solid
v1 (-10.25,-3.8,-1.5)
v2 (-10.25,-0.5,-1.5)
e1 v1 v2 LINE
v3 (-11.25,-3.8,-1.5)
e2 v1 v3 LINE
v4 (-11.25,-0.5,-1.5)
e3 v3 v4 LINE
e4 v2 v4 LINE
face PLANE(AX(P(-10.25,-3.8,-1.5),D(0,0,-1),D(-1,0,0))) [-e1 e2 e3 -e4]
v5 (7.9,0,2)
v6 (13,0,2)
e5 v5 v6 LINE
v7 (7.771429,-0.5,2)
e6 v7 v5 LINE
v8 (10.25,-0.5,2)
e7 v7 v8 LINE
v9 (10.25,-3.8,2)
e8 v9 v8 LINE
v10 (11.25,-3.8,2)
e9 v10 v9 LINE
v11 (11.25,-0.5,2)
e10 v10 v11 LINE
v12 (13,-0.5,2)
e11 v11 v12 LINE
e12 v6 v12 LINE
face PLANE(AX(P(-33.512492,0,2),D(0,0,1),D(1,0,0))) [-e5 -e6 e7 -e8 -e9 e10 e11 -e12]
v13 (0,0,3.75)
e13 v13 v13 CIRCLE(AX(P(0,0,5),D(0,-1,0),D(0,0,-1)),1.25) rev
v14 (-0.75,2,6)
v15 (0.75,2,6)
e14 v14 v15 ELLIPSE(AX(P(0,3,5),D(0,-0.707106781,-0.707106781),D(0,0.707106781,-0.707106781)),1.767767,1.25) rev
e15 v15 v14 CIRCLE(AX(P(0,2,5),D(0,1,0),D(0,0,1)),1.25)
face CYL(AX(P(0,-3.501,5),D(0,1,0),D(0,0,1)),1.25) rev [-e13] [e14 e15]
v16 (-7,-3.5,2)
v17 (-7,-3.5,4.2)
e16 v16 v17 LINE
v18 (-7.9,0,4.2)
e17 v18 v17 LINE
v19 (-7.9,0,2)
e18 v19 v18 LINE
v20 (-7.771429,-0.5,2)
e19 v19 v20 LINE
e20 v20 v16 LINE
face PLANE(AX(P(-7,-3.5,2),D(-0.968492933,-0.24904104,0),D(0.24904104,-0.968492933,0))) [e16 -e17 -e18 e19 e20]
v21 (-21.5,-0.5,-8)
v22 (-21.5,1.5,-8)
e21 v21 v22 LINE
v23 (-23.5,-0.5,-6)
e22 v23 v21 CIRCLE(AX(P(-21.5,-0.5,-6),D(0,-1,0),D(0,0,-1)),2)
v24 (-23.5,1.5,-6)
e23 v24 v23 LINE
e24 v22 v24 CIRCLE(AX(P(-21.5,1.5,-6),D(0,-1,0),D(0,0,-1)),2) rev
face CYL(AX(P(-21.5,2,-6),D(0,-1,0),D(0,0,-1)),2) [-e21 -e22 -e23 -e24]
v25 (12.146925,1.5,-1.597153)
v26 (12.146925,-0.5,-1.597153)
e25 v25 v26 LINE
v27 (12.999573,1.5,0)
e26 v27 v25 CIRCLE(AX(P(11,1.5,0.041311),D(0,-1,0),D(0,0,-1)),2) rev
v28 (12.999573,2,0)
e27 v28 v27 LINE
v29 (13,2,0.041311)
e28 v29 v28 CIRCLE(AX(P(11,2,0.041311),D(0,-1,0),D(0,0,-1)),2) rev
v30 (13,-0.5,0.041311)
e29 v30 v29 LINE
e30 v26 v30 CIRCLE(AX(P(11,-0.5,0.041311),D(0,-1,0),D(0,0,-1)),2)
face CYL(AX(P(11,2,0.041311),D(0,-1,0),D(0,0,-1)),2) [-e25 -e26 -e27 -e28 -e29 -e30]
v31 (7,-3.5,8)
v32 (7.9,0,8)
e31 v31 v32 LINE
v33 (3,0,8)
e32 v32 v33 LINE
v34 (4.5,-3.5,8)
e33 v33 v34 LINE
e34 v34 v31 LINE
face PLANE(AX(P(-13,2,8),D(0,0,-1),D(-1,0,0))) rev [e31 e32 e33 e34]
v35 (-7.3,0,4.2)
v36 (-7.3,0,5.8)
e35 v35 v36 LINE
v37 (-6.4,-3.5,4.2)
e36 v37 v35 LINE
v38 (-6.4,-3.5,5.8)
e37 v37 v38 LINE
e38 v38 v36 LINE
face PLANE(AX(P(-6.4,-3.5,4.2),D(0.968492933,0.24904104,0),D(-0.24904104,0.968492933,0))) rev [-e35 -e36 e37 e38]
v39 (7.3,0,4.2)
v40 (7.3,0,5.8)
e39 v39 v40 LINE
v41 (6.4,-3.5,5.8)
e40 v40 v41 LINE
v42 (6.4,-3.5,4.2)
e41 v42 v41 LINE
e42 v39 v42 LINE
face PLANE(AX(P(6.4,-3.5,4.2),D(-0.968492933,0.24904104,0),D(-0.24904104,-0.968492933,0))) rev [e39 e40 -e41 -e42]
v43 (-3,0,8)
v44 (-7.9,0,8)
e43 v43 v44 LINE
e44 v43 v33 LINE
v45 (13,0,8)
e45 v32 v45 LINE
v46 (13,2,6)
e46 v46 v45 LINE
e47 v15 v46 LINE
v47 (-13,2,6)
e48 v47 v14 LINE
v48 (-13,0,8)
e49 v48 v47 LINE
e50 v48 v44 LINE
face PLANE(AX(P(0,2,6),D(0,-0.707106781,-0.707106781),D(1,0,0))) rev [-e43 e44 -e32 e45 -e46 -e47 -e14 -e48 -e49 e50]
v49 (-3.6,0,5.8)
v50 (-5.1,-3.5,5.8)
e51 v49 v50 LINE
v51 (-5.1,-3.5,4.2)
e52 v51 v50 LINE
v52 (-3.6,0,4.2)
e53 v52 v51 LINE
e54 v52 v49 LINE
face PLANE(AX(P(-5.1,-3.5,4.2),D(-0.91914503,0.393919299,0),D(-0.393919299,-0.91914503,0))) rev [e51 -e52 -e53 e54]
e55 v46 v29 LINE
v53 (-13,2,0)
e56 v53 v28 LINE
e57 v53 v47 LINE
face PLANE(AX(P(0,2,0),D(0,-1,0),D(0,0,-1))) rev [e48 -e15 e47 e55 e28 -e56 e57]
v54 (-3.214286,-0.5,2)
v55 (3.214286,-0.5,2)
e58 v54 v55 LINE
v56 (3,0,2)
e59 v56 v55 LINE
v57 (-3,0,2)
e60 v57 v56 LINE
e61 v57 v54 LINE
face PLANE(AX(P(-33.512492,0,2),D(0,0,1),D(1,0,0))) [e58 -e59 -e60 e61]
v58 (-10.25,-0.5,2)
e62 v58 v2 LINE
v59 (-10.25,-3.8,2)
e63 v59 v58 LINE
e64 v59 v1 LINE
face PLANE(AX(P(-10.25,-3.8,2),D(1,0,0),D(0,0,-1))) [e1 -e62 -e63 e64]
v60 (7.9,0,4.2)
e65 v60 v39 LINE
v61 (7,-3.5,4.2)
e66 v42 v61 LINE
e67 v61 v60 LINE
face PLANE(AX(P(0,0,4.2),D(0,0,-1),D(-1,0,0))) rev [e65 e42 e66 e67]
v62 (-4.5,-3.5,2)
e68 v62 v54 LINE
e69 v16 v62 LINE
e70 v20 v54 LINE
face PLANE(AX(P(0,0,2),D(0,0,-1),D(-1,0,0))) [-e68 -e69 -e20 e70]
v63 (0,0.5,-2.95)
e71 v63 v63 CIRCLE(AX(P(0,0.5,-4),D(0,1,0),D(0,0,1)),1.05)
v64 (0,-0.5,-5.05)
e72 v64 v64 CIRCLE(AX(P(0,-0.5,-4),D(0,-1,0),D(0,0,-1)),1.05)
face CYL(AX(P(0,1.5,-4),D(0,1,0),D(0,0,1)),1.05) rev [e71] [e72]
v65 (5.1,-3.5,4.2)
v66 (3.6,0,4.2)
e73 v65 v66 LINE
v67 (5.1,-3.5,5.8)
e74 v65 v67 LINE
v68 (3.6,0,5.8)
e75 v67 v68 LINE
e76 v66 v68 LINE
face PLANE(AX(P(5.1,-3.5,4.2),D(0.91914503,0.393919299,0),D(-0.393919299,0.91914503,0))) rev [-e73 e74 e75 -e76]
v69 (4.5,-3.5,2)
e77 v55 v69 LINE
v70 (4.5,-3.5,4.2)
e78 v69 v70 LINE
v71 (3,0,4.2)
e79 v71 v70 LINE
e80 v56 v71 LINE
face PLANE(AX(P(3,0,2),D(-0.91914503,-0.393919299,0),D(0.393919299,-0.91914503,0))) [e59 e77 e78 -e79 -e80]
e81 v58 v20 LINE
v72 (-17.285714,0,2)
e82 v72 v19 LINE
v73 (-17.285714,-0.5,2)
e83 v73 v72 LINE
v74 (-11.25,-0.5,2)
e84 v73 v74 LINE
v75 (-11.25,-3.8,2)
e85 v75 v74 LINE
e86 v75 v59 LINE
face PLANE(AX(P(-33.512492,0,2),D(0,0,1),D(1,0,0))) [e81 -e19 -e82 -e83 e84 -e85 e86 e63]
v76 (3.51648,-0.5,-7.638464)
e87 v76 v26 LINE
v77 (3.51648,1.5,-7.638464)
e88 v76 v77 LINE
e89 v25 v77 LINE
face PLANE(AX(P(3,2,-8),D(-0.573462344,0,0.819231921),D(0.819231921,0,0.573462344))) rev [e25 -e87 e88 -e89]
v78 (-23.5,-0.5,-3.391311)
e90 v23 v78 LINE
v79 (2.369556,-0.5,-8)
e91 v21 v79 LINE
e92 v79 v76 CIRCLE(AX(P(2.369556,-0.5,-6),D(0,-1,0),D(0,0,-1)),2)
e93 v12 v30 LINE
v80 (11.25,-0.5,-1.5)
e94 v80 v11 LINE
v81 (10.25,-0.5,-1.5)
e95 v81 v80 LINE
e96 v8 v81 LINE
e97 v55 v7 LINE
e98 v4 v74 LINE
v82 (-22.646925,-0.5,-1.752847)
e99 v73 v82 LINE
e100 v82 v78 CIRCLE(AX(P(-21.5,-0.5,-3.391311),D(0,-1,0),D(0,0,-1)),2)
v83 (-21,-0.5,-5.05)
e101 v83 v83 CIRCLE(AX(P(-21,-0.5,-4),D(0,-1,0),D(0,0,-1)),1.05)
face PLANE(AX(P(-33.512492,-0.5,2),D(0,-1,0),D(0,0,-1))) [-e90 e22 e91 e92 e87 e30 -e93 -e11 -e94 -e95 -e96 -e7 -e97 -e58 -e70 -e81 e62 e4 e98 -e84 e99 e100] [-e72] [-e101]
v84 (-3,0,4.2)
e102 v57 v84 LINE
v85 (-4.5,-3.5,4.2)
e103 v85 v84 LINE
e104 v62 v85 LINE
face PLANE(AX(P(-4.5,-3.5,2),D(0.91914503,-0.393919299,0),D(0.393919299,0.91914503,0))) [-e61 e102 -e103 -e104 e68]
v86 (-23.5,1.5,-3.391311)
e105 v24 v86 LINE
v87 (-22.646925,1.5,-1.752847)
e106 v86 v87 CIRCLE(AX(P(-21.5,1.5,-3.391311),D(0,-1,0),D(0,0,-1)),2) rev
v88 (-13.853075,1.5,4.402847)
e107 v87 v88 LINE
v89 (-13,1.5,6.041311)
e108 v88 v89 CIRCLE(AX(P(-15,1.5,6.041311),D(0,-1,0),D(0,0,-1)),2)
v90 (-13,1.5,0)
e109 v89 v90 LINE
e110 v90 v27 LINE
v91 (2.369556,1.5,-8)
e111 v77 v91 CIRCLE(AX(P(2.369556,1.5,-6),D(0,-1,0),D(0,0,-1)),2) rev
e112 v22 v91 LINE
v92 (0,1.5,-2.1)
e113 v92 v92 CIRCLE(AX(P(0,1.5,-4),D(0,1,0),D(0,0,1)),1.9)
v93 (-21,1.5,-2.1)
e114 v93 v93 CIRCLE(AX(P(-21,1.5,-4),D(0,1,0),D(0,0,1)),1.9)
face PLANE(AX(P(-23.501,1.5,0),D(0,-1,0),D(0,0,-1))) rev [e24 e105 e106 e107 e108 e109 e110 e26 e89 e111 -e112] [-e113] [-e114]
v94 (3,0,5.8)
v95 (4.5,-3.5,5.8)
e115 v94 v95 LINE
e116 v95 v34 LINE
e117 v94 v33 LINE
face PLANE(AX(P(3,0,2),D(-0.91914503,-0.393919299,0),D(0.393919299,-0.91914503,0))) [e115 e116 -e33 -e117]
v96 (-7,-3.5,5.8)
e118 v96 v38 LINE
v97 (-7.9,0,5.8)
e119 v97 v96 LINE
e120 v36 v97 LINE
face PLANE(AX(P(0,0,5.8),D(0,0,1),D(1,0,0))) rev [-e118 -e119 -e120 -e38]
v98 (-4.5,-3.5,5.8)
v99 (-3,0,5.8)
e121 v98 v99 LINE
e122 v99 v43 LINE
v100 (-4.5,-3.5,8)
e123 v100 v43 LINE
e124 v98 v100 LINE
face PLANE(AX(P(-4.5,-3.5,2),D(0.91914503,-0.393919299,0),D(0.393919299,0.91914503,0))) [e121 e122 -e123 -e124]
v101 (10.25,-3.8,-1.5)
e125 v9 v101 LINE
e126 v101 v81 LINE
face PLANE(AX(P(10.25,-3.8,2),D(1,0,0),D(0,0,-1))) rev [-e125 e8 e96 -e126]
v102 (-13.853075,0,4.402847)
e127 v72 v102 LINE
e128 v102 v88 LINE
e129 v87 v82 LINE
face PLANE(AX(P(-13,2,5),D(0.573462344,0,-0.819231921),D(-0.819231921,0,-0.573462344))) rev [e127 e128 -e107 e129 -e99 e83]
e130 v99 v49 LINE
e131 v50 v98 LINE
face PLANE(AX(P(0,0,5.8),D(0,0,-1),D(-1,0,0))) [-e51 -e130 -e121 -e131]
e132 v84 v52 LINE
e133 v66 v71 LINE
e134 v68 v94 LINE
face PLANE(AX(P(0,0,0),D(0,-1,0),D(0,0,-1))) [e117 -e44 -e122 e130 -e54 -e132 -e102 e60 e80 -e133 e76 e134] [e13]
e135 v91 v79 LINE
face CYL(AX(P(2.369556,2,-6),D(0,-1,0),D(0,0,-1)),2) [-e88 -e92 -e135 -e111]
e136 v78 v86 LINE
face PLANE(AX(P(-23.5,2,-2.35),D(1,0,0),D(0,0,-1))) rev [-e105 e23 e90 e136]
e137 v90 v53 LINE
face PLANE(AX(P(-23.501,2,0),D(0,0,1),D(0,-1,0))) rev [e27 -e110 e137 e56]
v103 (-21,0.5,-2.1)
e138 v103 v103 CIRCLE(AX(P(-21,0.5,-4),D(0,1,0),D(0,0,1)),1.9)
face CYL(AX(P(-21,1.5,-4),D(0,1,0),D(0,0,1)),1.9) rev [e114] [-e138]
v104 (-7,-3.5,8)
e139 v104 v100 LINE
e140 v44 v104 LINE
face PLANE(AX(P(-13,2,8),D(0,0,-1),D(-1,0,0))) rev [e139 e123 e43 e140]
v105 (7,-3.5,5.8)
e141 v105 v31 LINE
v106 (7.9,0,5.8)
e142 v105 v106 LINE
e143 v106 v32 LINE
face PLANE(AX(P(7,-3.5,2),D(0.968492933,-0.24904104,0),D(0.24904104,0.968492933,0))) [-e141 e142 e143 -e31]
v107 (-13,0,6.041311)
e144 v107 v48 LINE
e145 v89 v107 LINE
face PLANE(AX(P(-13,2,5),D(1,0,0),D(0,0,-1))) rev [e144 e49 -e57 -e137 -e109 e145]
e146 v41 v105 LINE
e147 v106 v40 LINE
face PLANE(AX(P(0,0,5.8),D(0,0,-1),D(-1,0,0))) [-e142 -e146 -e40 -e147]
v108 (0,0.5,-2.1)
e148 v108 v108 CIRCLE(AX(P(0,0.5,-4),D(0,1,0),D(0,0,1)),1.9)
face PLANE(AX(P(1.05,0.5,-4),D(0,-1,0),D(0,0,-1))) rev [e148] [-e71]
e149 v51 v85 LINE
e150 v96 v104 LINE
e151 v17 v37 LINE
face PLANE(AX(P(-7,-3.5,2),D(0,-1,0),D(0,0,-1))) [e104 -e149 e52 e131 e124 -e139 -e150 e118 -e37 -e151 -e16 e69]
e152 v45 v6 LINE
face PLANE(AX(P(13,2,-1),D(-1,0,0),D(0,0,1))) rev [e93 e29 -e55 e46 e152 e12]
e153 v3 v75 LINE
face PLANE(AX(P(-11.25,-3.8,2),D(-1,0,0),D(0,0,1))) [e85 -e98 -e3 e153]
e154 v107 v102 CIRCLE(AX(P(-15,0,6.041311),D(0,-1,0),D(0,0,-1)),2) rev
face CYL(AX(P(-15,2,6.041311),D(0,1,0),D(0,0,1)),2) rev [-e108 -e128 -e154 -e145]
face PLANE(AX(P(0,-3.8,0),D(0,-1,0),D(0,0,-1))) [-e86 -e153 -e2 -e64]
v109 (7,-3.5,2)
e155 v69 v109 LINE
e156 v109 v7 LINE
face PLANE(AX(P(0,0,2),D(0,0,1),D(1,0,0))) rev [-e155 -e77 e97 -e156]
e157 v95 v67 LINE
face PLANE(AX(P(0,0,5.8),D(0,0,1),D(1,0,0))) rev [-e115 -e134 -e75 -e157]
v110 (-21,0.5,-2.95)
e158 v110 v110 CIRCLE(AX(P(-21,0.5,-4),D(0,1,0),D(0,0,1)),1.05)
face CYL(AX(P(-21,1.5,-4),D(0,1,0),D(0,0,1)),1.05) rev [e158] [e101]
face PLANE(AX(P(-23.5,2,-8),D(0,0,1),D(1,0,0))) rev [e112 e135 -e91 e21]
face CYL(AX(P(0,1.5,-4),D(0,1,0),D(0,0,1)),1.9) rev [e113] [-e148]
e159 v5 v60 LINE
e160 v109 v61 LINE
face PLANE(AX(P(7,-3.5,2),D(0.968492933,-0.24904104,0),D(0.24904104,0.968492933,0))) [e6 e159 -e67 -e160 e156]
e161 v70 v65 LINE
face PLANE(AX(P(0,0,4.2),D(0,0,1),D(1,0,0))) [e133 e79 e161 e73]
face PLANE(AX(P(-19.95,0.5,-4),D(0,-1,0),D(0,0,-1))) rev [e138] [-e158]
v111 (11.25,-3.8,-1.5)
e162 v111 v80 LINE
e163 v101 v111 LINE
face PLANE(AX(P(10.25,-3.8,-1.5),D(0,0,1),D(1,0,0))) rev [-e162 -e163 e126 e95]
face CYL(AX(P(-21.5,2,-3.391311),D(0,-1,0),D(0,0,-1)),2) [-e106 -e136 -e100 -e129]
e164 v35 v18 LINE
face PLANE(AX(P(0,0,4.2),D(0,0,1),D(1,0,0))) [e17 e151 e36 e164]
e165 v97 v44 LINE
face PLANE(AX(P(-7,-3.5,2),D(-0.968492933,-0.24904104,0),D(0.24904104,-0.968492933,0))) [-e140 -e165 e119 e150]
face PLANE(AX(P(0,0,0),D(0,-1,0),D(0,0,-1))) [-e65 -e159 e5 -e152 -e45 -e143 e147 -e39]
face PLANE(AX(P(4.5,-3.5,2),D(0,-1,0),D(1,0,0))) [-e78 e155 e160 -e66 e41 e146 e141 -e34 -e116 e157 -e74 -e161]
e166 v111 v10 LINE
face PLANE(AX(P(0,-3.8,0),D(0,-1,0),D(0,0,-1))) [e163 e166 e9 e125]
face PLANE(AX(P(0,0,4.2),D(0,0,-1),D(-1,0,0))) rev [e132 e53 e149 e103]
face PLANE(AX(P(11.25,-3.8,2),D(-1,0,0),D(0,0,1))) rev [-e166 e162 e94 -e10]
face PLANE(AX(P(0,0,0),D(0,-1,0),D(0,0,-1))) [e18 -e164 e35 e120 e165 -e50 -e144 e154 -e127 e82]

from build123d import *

# Parameters (mm, degrees)
EXTRUDE_1_DEPTH              = 2
EXTRUDE_3_DEPTH              = 6
CUT_EXTRUDE_1_REACH          = 27.426
SKETCH_5_R                   = 1.25
EXTRUDE_4_REACH              = 39.53
SKETCH_6_W                   = 10
SKETCH_6_H                   = 0.5
CUT_EXTRUDE_2_REACH          = 39.53
SKETCH_7_W                   = 8
SKETCH_7_H                   = 0.5
SKETCH_10_W                  = 1
SKETCH_10_H                  = 3.5
EXTRUDE_5_DEPTH              = 3.3
CHAMFER_1_SIZE               = 2
CUT_EXTRUDE_3_REACH          = 27.114
CUT_EXTRUDE_4_DEPTH          = 0.5
HOLE_WIZARD_M2_2_D           = 2.1
HOLE_WIZARD_M2_2_CBORE_D     = 3.8
HOLE_WIZARD_M2_2_CBORE_DEPTH = 1
FILLET_3_R                   = 2
CUT_EXTRUDE_5_DEPTH          = 0.8


with BuildPart() as part:
    # ｽｹｯﾁ1 → ﾎﾞｽ - 押し出し1 (new body)
    with BuildSketch(Plane(origin=(0, 0, 0), x_dir=(1, 0, 0), z_dir=(0, 1, 0))):
        Polygon((-13, 8), (3, 8), (13, 1), (13, -8), (-13, -8), (-13, -5), (-23.5, 2.35), (-23.5, 8), align=None)
    extrude(amount=EXTRUDE_1_DEPTH)

    # ｽｹｯﾁ4 → ﾎﾞｽ - 押し出し3 (add)
    with BuildSketch(Plane.XY.offset(8)):
        Polygon((-7, -3.5), (-4.5, -3.5), (-3, 0), (-7.9, 0), align=None)
        Polygon((3, 0), (4.5, -3.5), (7, -3.5), (7.9, 0), align=None)
    extrude(amount=-EXTRUDE_3_DEPTH)

    # ｽｹｯﾁ5 → ｶｯﾄ - 押し出し1 (cut, up to next)
    with BuildSketch(Plane(origin=(0, 2, 0), x_dir=(1, 0, 0), z_dir=(0, 1, 0)), mode=Mode.PRIVATE) as cut_extrude_1_sk1:
        with Locations(Location((0, -5, 0), (0, 0, 270))):
            Circle(SKETCH_5_R)
    cut_extrude_1_tool1 = extrude(cut_extrude_1_sk1.sketch, amount=-CUT_EXTRUDE_1_REACH, mode=Mode.PRIVATE) & part.part
    add(cut_extrude_1_tool1.solids().sort_by_distance((0, 2, 5))[0], mode=Mode.SUBTRACT)

    # ﾎﾞｽ - 押し出し4: up to this face of the body (flat: up to its plane)
    extrude_4_end = Plane(part.part.faces().sort_by_distance((-23.5, 1, -5.175))[0])
    # ｽｹｯﾁ6 → ﾎﾞｽ - 押し出し4 (add, up to the picked face)
    with BuildSketch(Plane(origin=(13, 0, 0), x_dir=(0, 0, -1), z_dir=(1, 0, 0)), mode=Mode.PRIVATE) as extrude_4_sk1:
        with Locations((3, -0.25)):
            Rectangle(SKETCH_6_W, SKETCH_6_H)
    extrude_4_tool1 = split(extrude(extrude_4_sk1.sketch, amount=-EXTRUDE_4_REACH, mode=Mode.PRIVATE), bisect_by=extrude_4_end, keep=Keep.BOTH, mode=Mode.PRIVATE)
    add(extrude_4_tool1.solids().sort_by(Axis((13, -0.25, -3), (-1, 0, 0)))[0])

    # ｽｹｯﾁ7 → ｶｯﾄ - 押し出し2 (cut, up to next)
    with BuildSketch(Plane(origin=(13, 0, 0), x_dir=(0, 0, -1), z_dir=(1, 0, 0)), mode=Mode.PRIVATE) as cut_extrude_2_sk1:
        with Locations((4, 1.75)):
            Rectangle(SKETCH_7_W, SKETCH_7_H)
    cut_extrude_2_tool1 = extrude(cut_extrude_2_sk1.sketch, amount=-CUT_EXTRUDE_2_REACH, mode=Mode.PRIVATE) & part.part
    add(cut_extrude_2_tool1.solids().sort_by_distance((13, 1.75, -4))[0], mode=Mode.SUBTRACT)

    # ｽｹｯﾁ10 → ﾎﾞｽ - 押し出し5 (add)
    with BuildSketch(Plane.XZ.offset(0.5)):
        with Locations((10.75, 0.25)):
            Rectangle(SKETCH_10_W, SKETCH_10_H)
    extrude_5 = extrude(amount=EXTRUDE_5_DEPTH)

    # ﾐﾗｰ1: ﾎﾞｽ - 押し出し5 across plane
    add(extrude_5.mirror(Plane(origin=(0, 0, 0), x_dir=(0, 0, 1), z_dir=(1, 0, 0))))

    # 面取り1
    # the kernel refuses this chamfer: 2 mm, written as the material it takes off along each edge
    with BuildSketch(Plane(origin=(18.143365976, 2, 8), x_dir=(0, -0.9996219169112968, 0.027495876610586494), z_dir=(-1, 0, 0))) as chamfer_1_piece_1:
        Polygon((CHAMFER_1_SIZE * 0.999621916911, -CHAMFER_1_SIZE * 0.0274958766106), (-CHAMFER_1_SIZE * 0.0274958766106, -CHAMFER_1_SIZE * 0.999621916911), (0, 0), align=None)
    extrude(amount=36.286731952, mode=Mode.SUBTRACT)

    # ｽｹｯﾁ12 → ｶｯﾄ - 押し出し3 (cut, up to next)
    with BuildSketch(Plane(origin=(0, 0, 0), x_dir=(1, 0, 0), z_dir=(0, 1, 0)), mode=Mode.PRIVATE) as cut_extrude_3_sk1:
        Polygon((3, 8), (13, 8), (13, 1), align=None)
    cut_extrude_3_tool1 = extrude(cut_extrude_3_sk1.sketch, amount=-CUT_EXTRUDE_3_REACH, mode=Mode.PRIVATE) & part.part
    # ｽｹｯﾁ12 → ｶｯﾄ - 押し出し3 (cut, up to next)
    with BuildSketch(Plane(origin=(0, 0, 0), x_dir=(1, 0, 0), z_dir=(0, 1, 0)), mode=Mode.PRIVATE) as cut_extrude_3_sk2:
        Polygon((-23.5, -2), (-17.285714286, -2), (-23.5, 2.35), align=None)
    cut_extrude_3_tool2 = extrude(cut_extrude_3_sk2.sketch, amount=-CUT_EXTRUDE_3_REACH, mode=Mode.PRIVATE) & part.part
    add(cut_extrude_3_tool1.solids().sort_by_distance((9.666667, 0, -5.666667))[0], mode=Mode.SUBTRACT)
    add(cut_extrude_3_tool2.solids().sort_by_distance((-21.428571, 0, 0.55))[0], mode=Mode.SUBTRACT)

    # ｽｹｯﾁ13 → ｶｯﾄ - 押し出し4 (cut)
    with BuildSketch(Plane(origin=(0, 2, 0), x_dir=(1, 0, 0), z_dir=(0, 1, 0))):
        Polygon((-13, -5), (-13, 0), (-20.142857143, 0), align=None)
    extrude(amount=-CUT_EXTRUDE_4_DEPTH, mode=Mode.SUBTRACT)

    # M2 丸平ねじ用座ぐり穴2 (through all)
    with Locations(Plane(origin=(0, 1.5, 0), x_dir=(1, 0, 0), z_dir=(0, 1, 0))):
        with Locations((-21, 4), (0, 4)):
            CounterBoreHole(HOLE_WIZARD_M2_2_D / 2, HOLE_WIZARD_M2_2_CBORE_D / 2, HOLE_WIZARD_M2_2_CBORE_DEPTH)

    # ﾌｨﾚｯﾄ3
    fillet_3_edges = [part.edges().sort_by_distance(p)[0] for p in [
        (-13, 0.75, 5),
        (13, 0.5, -1),
        (3, 0.5, -8),
        (-23.5, 0.5, -8),
        (-23.5, 0.5, -2.35),
    ]]
    fillet(fillet_3_edges, radius=FILLET_3_R)

    # ｽｹｯﾁ16 → ｶｯﾄ - 押し出し5 (cut, symmetric)
    with BuildSketch(Plane.XY.offset(5)):
        Polygon((-7.9, 0), (-7, -3.5), (-6.4, -3.5), (-7.3, 0), align=None)
        Polygon((-3, 0), (-4.5, -3.5), (-5.1, -3.5), (-3.6, 0), align=None)
        Polygon((3, 0), (4.5, -3.5), (5.1, -3.5), (3.6, 0), align=None)
        Polygon((7.9, 0), (7, -3.5), (6.4, -3.5), (7.3, 0), align=None)
    extrude(amount=CUT_EXTRUDE_5_DEPTH, both=True, mode=Mode.SUBTRACT)


solid = part.part
